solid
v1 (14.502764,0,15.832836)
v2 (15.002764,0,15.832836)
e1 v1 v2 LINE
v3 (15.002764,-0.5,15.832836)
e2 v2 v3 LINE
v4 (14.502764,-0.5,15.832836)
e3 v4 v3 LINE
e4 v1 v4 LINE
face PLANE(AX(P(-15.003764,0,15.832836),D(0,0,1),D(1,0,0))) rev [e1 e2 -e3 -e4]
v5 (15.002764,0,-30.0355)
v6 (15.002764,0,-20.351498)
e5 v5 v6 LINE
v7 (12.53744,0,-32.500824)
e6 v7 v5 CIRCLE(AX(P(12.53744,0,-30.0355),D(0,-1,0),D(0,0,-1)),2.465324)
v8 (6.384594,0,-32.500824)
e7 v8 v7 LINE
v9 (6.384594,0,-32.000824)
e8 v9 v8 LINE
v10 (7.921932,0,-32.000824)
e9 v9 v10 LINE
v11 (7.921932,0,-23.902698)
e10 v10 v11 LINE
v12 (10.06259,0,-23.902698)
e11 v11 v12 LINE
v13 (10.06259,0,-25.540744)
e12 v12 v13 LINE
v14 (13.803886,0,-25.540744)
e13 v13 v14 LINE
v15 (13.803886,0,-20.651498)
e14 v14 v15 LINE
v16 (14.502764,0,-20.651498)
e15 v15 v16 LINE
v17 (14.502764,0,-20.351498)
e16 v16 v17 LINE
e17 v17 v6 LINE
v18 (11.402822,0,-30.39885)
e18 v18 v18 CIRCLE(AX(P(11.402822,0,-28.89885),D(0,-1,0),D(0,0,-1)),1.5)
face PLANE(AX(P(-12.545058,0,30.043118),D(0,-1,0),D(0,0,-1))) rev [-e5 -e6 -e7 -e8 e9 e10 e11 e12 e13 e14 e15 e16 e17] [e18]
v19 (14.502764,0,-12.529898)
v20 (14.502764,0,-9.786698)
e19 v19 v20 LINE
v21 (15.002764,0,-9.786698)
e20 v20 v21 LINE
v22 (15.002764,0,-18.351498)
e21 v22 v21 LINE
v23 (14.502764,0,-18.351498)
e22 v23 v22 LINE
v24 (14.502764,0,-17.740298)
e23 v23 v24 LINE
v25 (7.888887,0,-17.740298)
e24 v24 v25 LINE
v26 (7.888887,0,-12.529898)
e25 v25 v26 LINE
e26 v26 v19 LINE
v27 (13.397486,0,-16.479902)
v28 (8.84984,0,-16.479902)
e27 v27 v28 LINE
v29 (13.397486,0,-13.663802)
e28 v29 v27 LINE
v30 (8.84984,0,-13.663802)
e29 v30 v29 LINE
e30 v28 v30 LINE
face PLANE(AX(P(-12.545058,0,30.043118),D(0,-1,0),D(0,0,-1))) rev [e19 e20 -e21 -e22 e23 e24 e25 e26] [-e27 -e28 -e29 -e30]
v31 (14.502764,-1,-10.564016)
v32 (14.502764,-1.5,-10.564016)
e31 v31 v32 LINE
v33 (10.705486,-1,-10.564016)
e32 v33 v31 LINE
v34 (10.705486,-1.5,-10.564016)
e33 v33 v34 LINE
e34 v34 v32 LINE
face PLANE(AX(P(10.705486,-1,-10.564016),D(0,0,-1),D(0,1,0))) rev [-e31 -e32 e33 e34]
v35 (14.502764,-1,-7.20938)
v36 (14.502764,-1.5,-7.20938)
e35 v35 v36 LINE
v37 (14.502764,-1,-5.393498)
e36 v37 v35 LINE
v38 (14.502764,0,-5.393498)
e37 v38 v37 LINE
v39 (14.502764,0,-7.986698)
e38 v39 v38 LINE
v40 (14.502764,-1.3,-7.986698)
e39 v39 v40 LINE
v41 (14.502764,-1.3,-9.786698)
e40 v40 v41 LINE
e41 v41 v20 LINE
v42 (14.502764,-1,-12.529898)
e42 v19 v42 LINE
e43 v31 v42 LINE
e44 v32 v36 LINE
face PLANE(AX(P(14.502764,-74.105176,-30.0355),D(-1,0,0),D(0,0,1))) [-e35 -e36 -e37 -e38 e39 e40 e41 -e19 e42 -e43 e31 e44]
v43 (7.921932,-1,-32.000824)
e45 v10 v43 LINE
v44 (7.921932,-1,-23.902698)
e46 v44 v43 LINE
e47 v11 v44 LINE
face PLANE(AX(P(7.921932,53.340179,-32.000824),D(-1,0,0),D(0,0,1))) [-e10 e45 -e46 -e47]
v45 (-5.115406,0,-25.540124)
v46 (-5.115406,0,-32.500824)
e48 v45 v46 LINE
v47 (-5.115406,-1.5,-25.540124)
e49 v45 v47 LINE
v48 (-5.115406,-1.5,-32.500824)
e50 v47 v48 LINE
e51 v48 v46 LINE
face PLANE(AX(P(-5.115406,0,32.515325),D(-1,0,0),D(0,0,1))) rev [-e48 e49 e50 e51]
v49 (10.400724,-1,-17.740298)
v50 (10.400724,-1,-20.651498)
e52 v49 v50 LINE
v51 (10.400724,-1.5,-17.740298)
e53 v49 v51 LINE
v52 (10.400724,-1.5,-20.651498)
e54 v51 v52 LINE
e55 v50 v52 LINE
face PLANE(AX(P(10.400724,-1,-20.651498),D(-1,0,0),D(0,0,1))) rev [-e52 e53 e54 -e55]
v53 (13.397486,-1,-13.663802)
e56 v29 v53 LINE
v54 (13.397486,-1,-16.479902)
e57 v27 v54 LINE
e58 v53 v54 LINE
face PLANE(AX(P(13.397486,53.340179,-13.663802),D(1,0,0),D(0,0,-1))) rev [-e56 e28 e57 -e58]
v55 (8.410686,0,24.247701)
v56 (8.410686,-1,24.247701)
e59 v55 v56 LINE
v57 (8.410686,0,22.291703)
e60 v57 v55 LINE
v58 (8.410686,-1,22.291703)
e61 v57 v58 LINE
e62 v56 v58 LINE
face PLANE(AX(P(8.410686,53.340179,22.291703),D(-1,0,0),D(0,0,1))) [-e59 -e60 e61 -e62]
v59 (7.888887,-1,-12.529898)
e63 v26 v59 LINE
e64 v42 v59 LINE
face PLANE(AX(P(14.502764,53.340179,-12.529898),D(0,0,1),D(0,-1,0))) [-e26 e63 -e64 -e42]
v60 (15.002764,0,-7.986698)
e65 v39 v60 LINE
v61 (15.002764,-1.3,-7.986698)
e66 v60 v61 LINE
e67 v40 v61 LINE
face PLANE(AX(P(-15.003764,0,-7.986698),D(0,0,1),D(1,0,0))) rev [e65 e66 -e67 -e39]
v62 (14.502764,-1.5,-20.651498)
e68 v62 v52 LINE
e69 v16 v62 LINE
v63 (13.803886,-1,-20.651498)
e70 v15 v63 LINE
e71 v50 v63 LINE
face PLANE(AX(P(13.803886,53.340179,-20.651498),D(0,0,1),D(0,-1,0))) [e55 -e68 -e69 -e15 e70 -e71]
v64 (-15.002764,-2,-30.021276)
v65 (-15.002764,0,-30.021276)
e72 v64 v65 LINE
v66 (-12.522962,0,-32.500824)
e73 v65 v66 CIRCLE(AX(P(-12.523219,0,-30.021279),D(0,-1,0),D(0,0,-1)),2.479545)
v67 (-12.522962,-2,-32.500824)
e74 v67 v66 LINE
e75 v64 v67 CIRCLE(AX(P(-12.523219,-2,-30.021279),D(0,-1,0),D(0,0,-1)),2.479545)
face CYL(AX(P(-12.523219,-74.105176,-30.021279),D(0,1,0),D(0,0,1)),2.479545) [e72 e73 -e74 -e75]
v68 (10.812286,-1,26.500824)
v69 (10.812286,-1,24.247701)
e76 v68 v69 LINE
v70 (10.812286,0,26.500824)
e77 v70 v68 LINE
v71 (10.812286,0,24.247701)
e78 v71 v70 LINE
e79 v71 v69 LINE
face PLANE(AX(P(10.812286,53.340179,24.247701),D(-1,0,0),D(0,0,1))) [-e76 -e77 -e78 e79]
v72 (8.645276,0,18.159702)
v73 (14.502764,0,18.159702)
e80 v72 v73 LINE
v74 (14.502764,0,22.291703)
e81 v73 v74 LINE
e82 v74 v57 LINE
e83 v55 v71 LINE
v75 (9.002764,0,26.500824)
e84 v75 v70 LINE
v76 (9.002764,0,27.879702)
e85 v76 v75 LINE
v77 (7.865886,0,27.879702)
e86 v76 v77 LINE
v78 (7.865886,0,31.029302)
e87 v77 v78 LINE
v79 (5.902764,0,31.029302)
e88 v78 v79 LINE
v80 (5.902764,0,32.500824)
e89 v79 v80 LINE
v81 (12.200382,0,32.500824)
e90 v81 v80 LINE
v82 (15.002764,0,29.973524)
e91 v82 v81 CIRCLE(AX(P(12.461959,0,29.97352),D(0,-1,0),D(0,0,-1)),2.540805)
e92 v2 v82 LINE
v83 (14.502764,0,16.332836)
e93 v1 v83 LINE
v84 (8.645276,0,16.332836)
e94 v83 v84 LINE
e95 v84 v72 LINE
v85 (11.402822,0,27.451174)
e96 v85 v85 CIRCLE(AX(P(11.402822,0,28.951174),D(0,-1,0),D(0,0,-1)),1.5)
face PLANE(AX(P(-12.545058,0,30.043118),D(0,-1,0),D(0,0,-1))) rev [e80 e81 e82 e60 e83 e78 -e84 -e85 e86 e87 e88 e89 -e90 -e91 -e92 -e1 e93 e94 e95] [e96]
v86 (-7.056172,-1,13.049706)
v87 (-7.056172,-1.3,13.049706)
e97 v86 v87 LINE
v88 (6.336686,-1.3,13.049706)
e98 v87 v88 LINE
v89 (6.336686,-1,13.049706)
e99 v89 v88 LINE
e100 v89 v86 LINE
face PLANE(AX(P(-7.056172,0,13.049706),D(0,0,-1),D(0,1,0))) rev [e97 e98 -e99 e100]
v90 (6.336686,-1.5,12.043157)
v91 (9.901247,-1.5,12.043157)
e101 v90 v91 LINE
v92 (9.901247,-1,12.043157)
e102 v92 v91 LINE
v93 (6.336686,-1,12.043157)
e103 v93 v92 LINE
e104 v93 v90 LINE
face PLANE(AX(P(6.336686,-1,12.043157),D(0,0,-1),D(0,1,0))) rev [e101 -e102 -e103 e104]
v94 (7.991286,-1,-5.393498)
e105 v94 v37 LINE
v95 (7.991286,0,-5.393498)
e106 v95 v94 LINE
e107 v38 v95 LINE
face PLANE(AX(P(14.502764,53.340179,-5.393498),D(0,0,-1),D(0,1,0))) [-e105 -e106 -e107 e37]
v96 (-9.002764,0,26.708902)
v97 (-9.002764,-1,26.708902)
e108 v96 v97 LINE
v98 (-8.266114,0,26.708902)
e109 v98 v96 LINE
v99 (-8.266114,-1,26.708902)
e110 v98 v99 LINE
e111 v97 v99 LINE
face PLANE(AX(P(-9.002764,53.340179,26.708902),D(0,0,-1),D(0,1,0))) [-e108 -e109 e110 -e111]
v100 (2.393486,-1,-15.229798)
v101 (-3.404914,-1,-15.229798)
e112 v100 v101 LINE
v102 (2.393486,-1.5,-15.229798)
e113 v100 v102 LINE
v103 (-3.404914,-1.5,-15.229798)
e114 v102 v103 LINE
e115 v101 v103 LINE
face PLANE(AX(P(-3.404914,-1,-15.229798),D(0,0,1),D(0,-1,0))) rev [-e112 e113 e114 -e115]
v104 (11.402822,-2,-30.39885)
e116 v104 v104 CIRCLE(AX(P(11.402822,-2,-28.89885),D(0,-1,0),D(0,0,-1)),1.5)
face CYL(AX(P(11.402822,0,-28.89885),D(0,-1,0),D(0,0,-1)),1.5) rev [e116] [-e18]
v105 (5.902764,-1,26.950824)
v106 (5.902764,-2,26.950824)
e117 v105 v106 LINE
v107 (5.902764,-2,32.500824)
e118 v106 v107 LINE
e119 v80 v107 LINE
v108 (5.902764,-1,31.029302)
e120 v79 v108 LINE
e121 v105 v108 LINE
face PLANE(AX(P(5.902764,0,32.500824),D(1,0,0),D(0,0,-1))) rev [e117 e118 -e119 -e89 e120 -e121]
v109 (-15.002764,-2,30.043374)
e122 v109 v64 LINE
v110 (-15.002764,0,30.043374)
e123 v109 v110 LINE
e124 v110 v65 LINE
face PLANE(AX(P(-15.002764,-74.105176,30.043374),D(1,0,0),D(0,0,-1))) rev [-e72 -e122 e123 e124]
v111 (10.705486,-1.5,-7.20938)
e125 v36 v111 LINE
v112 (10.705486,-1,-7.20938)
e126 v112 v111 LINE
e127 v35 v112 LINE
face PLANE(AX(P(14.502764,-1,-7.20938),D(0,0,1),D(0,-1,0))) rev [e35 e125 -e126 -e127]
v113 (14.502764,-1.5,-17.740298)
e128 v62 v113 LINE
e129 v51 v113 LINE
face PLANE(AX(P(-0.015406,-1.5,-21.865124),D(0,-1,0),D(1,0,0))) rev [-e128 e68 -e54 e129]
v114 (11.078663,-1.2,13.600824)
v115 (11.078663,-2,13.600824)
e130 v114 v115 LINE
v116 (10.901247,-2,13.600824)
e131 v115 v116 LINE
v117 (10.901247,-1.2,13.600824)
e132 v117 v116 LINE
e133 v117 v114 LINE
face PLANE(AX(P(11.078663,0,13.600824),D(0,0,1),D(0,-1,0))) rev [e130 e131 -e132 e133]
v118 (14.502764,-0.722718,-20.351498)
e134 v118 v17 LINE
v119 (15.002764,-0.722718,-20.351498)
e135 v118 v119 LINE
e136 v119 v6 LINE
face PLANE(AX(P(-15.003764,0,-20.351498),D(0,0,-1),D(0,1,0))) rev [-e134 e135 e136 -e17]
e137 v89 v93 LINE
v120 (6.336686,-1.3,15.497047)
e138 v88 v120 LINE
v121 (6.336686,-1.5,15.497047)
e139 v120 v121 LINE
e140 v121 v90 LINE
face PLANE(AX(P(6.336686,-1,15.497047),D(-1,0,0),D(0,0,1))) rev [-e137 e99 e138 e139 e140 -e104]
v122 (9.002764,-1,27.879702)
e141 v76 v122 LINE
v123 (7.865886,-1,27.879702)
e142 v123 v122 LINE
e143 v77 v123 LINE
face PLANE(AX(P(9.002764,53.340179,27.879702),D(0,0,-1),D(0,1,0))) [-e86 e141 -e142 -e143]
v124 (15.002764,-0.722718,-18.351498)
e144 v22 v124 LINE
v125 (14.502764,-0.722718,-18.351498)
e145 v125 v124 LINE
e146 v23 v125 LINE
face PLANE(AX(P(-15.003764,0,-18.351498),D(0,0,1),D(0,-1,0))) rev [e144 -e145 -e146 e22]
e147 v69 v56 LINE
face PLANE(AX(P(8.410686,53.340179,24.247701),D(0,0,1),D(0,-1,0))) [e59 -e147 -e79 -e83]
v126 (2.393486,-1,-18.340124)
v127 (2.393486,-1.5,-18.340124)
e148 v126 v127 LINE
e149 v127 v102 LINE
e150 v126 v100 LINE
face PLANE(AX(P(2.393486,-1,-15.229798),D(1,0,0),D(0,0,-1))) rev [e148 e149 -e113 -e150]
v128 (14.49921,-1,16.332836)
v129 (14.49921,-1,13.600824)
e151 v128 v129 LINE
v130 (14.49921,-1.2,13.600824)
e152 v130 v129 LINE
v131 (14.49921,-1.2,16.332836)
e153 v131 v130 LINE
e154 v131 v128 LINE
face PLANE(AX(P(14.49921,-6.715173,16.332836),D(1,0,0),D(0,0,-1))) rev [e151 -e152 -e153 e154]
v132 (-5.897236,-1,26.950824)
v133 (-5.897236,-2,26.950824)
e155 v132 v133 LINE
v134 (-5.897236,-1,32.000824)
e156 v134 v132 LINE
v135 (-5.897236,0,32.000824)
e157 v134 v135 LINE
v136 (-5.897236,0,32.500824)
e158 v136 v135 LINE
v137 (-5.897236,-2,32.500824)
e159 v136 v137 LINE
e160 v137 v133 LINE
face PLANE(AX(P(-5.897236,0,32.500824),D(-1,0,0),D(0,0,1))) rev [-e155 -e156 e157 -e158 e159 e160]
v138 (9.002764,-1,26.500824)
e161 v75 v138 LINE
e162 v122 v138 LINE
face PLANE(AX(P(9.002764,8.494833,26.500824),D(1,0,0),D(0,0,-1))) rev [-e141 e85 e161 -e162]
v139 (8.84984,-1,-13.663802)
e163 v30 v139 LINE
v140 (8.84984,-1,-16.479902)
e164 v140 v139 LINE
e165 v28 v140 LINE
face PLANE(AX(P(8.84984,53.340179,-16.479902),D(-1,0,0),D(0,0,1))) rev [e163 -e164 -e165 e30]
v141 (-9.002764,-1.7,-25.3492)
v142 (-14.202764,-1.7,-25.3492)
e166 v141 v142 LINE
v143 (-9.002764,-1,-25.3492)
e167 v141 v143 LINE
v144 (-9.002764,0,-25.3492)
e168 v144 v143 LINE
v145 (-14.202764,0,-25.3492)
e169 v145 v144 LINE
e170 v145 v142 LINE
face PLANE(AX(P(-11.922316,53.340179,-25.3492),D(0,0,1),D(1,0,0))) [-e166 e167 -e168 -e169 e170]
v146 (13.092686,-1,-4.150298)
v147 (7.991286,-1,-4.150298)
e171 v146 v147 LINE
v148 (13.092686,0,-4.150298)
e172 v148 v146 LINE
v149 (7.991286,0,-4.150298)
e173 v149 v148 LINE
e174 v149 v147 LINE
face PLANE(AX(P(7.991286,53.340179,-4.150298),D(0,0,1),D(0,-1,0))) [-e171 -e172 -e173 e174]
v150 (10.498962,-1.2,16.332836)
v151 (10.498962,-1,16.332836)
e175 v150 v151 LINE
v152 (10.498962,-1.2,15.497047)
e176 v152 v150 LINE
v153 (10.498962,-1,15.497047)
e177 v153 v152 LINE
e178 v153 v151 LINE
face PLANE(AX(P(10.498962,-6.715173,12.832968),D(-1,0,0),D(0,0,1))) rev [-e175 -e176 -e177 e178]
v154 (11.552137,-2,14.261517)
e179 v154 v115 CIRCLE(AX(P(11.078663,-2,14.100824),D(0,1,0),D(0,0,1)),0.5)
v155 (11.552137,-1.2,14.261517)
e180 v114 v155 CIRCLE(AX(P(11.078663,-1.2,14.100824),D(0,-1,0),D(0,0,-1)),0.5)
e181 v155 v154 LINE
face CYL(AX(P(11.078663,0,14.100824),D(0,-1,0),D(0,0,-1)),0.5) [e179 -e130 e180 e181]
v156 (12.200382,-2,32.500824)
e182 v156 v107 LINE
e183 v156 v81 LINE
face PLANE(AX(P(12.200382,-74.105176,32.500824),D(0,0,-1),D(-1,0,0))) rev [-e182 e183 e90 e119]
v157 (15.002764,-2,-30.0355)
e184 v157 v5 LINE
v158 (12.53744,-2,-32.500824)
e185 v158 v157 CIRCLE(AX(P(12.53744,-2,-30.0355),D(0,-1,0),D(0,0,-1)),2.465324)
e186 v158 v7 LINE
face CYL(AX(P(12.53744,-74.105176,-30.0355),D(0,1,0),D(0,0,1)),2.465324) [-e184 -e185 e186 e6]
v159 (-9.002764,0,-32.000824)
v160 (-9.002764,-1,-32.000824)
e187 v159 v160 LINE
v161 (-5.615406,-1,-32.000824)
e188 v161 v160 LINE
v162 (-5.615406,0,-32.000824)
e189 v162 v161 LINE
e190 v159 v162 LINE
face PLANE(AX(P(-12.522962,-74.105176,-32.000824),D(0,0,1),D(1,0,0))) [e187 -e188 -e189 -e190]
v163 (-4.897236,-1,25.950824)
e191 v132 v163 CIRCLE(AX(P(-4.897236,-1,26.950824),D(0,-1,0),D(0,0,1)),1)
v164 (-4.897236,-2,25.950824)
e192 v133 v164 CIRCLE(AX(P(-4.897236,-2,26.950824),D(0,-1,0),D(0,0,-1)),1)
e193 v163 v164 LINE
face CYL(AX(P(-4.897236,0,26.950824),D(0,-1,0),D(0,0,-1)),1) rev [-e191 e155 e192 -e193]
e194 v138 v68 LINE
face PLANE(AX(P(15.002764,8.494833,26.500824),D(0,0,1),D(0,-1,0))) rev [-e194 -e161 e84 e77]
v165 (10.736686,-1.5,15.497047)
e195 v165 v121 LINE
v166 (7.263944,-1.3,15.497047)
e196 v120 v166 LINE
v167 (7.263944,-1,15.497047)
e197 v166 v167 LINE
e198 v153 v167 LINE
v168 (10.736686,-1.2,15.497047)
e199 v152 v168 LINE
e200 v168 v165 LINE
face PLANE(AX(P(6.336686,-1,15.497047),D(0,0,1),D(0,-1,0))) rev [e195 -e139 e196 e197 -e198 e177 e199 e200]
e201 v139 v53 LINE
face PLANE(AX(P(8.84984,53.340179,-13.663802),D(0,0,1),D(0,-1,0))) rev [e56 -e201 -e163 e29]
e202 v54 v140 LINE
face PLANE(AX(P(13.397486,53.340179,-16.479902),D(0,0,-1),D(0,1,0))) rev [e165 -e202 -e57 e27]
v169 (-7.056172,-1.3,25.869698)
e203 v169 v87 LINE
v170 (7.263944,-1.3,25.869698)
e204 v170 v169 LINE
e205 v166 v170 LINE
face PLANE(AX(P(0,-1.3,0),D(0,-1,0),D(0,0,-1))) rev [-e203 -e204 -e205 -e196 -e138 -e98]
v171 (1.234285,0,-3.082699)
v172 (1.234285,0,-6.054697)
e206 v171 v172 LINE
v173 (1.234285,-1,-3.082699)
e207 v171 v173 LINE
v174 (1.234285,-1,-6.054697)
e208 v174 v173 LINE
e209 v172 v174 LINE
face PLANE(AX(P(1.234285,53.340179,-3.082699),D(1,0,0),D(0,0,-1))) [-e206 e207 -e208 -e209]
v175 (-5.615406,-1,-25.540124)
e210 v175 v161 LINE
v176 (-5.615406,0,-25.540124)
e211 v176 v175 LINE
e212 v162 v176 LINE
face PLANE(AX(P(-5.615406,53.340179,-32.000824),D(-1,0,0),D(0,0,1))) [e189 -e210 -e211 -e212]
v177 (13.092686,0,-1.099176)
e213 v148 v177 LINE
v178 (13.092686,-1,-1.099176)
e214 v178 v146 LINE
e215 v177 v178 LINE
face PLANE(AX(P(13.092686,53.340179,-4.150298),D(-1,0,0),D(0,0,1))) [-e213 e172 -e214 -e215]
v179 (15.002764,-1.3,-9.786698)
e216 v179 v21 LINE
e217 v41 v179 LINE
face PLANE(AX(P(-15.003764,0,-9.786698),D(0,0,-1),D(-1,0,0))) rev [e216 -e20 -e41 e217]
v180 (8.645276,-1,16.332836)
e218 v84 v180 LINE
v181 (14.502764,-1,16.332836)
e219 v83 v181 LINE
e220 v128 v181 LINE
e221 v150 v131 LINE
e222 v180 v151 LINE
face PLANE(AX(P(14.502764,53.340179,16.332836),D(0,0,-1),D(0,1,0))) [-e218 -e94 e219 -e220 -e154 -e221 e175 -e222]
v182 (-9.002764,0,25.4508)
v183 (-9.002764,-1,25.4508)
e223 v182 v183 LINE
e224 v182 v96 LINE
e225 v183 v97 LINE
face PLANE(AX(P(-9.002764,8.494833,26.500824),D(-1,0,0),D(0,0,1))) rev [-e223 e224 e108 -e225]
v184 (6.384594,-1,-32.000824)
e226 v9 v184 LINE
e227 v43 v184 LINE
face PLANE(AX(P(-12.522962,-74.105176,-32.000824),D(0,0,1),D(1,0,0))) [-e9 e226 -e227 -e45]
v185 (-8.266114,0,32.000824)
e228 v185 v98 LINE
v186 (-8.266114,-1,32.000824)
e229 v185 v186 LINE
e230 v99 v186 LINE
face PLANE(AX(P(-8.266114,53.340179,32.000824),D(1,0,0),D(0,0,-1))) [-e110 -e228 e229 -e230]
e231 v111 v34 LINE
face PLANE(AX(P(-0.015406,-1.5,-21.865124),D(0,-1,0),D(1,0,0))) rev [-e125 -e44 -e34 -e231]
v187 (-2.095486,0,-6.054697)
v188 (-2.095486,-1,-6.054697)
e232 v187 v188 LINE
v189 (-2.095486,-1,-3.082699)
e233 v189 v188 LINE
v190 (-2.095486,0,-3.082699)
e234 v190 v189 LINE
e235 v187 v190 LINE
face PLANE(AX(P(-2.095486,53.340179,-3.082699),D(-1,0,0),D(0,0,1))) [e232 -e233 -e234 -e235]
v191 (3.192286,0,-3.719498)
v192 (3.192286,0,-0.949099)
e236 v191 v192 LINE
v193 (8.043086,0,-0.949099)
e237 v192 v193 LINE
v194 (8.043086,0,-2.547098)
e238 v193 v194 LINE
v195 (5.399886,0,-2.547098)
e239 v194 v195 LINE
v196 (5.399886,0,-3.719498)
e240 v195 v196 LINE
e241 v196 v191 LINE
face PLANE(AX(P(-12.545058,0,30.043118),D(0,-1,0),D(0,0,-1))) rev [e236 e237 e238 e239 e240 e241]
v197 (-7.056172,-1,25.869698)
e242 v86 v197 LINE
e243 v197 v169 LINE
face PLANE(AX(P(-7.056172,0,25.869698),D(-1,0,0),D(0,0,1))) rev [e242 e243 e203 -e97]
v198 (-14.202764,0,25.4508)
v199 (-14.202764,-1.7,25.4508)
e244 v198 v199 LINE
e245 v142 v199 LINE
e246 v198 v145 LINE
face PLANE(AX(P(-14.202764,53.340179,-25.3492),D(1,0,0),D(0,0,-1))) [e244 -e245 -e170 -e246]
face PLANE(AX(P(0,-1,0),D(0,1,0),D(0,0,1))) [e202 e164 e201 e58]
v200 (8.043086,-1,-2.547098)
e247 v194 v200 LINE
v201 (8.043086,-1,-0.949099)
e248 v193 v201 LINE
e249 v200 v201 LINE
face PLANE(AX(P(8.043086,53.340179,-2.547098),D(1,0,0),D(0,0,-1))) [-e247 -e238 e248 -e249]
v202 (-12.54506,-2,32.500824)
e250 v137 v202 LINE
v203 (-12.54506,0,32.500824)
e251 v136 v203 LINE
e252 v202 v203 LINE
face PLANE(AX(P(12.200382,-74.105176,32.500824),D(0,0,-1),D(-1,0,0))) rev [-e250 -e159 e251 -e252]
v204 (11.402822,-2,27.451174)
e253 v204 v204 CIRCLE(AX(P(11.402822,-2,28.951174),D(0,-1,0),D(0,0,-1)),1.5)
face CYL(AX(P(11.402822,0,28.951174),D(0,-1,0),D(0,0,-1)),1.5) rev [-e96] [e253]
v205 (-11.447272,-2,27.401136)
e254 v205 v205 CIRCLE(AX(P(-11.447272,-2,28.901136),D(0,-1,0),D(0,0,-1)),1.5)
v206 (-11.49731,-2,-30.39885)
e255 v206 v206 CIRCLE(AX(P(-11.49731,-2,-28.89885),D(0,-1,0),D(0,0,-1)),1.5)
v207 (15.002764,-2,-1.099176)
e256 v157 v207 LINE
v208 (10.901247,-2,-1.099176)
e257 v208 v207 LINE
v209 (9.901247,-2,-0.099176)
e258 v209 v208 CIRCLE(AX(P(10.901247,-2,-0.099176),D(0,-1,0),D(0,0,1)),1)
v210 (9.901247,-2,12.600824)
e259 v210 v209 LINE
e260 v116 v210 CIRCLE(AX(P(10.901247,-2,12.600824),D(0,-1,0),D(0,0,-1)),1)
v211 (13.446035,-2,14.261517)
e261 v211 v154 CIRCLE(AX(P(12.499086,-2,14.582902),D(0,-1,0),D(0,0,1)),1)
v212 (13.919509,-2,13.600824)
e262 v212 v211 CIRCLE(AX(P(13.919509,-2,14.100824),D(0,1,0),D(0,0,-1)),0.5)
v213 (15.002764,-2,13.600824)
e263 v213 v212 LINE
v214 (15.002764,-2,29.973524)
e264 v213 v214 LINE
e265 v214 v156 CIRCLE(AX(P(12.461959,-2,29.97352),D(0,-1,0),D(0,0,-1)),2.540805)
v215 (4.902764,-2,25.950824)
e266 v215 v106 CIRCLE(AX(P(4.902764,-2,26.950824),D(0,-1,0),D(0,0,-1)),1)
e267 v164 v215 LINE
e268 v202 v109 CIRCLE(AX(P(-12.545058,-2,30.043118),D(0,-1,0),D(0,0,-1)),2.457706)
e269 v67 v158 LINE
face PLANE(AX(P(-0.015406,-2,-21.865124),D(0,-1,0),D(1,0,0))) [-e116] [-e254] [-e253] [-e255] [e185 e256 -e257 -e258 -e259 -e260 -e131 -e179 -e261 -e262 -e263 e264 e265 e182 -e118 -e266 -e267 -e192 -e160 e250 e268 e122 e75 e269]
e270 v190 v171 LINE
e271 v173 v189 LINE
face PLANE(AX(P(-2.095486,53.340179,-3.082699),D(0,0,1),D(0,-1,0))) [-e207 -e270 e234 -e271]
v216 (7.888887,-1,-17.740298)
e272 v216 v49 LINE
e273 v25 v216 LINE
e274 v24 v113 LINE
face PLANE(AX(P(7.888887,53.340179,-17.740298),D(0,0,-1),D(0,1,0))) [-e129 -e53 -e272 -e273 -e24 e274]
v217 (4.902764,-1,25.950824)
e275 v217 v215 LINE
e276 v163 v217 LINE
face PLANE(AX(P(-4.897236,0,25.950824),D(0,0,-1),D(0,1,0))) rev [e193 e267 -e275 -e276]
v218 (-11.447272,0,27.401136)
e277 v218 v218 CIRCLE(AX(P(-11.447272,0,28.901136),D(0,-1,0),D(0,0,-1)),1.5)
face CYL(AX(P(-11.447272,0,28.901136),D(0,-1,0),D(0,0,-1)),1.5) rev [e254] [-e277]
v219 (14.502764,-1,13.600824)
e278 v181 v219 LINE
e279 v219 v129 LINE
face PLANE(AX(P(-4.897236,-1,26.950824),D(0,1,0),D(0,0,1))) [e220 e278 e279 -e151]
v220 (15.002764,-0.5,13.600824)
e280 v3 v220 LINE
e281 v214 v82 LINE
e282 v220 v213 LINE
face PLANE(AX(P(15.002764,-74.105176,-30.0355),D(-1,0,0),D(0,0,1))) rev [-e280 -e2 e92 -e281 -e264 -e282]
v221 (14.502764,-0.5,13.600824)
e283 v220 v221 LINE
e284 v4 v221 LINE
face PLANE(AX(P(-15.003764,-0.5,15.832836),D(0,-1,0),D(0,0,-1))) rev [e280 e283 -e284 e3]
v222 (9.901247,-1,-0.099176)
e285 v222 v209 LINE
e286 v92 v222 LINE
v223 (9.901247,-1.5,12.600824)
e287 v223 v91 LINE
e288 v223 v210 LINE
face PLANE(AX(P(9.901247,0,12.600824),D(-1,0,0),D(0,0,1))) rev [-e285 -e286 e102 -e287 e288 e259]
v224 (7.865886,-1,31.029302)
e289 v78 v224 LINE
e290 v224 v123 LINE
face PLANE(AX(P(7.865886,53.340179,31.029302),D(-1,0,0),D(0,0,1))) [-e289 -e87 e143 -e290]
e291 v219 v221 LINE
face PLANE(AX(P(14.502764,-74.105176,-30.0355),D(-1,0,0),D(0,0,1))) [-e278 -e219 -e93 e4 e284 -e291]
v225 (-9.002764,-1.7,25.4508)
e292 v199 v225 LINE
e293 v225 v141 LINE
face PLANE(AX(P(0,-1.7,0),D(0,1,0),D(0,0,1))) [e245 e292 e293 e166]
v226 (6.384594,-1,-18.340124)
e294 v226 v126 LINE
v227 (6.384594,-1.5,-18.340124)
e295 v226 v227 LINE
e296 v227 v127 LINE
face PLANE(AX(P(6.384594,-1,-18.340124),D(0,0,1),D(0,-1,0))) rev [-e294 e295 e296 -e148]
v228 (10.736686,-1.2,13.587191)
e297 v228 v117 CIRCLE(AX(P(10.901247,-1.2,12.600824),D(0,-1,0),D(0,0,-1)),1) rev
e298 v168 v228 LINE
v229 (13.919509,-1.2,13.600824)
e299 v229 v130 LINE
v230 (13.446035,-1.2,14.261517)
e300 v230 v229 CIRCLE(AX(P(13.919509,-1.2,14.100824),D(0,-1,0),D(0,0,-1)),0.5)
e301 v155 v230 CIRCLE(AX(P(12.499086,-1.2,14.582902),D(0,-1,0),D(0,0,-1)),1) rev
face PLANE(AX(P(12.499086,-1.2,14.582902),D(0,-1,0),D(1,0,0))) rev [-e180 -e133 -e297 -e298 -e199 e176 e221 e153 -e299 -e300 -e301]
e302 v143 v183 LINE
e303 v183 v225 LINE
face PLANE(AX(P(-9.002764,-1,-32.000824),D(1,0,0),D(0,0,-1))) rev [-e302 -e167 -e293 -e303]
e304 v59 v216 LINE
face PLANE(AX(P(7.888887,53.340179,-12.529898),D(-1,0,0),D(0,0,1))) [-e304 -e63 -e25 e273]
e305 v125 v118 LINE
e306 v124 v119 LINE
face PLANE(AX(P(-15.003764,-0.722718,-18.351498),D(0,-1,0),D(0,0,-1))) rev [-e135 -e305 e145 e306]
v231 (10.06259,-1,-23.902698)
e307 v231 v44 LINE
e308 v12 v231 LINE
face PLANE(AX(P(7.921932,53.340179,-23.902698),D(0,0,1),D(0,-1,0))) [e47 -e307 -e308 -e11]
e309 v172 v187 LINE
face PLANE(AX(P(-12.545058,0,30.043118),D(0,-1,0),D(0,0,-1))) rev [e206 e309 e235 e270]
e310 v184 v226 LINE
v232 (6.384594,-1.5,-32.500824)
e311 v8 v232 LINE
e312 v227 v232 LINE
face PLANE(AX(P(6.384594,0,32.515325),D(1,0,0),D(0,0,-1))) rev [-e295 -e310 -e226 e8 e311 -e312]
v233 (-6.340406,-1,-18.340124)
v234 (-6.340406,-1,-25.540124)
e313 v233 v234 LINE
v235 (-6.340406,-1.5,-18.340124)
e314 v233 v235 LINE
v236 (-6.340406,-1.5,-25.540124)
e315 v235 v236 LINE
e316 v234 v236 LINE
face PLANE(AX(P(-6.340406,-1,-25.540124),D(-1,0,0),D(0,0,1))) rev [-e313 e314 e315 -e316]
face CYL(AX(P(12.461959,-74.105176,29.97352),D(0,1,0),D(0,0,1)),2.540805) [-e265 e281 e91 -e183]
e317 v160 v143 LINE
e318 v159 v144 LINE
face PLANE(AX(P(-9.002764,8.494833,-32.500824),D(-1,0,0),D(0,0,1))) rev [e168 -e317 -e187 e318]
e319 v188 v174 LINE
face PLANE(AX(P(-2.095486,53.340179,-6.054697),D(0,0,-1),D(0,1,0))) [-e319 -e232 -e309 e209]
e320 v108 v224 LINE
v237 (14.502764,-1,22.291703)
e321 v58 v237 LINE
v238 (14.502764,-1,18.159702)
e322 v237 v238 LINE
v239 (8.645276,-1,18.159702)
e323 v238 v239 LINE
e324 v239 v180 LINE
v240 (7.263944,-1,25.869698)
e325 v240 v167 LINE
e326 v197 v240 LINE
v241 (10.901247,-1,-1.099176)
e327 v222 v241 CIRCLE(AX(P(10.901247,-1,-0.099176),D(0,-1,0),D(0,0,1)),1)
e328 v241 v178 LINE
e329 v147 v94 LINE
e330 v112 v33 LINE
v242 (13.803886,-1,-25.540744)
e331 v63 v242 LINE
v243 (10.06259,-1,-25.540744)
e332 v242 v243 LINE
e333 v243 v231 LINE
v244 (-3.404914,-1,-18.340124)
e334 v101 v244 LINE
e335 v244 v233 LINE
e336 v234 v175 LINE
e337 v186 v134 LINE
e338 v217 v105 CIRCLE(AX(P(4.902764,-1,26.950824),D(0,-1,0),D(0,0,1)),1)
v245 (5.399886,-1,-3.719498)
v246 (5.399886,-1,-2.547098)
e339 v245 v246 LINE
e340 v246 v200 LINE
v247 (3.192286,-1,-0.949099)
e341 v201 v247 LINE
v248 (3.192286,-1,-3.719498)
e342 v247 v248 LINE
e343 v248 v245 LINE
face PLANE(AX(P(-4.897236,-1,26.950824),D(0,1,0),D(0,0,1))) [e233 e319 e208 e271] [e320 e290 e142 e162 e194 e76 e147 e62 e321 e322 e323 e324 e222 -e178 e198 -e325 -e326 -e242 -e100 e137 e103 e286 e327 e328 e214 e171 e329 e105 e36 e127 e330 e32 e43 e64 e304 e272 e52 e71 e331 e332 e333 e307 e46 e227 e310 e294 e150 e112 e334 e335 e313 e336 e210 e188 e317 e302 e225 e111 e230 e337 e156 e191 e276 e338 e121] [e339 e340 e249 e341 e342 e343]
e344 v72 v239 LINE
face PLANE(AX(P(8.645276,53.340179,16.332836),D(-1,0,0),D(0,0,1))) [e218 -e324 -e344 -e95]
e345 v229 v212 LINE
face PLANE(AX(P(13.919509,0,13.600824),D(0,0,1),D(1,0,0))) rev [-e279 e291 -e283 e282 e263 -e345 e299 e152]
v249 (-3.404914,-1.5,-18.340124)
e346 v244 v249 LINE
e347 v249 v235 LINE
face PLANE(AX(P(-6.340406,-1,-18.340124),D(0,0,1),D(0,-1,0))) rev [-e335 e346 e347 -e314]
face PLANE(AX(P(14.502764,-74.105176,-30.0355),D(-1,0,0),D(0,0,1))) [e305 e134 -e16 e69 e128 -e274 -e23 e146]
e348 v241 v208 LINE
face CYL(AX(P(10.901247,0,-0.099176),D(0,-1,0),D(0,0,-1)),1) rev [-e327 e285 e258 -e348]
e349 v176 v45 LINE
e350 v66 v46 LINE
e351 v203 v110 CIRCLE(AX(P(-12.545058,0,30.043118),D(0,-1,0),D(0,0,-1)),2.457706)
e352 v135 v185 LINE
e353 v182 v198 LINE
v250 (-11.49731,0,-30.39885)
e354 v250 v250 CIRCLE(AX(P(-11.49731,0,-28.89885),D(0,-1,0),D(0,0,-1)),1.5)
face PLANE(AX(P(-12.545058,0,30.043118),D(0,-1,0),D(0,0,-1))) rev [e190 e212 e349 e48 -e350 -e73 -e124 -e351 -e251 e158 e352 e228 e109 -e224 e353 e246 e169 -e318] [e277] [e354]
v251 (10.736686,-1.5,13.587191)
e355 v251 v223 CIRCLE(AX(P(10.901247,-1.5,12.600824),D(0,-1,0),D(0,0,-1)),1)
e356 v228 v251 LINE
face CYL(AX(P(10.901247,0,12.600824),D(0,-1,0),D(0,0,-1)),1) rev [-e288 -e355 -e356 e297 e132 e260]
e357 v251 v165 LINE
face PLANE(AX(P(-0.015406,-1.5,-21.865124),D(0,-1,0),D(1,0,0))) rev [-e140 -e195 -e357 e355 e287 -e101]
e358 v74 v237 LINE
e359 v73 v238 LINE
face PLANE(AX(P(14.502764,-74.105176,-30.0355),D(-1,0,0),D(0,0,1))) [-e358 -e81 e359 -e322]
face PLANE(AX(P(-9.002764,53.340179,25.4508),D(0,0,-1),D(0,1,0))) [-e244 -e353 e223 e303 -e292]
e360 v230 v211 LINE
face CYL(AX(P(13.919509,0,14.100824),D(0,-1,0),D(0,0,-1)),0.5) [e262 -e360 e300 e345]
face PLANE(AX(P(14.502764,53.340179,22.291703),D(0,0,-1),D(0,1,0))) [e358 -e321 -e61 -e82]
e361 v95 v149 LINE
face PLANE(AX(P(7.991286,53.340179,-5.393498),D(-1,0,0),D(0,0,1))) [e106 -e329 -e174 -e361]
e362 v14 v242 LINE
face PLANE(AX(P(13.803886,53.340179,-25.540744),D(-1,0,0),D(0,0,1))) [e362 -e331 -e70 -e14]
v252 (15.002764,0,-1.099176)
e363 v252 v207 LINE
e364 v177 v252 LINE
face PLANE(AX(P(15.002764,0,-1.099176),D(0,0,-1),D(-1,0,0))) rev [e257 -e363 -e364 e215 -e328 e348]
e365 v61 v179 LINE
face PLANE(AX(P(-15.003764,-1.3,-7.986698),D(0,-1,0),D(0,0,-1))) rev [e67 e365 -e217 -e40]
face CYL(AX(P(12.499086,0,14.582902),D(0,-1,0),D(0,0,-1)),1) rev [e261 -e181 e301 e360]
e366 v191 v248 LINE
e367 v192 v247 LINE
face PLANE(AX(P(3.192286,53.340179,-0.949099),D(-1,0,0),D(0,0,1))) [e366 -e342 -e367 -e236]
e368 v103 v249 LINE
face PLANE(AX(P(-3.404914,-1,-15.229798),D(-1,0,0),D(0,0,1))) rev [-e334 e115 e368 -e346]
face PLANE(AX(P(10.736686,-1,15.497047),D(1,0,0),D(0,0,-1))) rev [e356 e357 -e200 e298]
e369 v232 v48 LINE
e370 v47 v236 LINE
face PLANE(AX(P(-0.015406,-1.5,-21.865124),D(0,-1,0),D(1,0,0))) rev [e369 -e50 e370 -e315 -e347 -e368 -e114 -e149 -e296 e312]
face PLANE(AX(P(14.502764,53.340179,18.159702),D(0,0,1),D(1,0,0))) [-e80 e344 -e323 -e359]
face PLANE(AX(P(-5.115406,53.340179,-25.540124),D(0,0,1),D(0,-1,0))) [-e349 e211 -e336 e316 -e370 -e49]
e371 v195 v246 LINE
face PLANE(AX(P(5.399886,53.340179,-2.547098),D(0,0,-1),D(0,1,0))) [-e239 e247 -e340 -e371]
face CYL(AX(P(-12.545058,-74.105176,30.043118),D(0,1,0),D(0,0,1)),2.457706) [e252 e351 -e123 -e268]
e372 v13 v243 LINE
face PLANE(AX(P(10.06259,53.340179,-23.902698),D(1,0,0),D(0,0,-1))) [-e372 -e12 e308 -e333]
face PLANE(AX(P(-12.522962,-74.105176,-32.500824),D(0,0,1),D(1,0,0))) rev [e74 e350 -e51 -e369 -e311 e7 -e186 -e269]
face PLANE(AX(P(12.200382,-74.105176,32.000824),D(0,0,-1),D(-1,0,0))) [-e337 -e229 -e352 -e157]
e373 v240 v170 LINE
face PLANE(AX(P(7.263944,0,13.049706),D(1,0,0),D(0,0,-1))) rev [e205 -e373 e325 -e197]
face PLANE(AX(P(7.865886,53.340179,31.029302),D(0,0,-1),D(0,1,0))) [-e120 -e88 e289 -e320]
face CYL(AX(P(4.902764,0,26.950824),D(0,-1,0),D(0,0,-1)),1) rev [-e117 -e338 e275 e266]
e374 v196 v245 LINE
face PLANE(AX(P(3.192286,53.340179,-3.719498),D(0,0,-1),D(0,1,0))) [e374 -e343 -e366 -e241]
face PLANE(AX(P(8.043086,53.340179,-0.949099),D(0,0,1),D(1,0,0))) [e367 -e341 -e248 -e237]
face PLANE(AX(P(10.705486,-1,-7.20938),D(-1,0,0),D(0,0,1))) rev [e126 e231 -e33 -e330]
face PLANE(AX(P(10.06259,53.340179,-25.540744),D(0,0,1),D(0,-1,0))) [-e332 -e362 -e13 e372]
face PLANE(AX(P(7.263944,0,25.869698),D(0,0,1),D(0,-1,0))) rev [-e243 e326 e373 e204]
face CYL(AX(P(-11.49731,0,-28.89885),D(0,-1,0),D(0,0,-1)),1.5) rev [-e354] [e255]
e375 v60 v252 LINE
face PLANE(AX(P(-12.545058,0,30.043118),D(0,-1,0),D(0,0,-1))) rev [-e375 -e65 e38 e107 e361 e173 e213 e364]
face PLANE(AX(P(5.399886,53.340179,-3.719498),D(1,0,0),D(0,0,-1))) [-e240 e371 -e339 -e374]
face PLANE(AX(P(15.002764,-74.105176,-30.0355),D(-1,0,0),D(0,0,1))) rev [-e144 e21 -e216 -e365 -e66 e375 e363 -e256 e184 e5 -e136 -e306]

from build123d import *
from build123d.topology import SkipClean

# Parameters (mm, degrees)
BOSS_EXTRUDE1_DEPTH      = 2
SHELL1_T                 = -0.5
BOSS_EXTRUDE3_START      = 1.5
BOSS_EXTRUDE3_DEPTH      = 1.5
SKETCH7_R                = 1.5
CUT_EXTRUDE4_DEPTH       = 36.864526101
CUT_EXTRUDE5_DEPTH       = 36.864526101
CUT_EXTRUDE6_REACH       = 68.754
SKETCH9_W                = 11.5
SKETCH9_H                = 1.5
SKETCH10_W               = 0.73665
SKETCH10_H               = 5.291922
SKETCH10_W_2             = 6.6138774
SKETCH10_H_2             = 5.2104
SKETCH10_W_3             = 4.547646
SKETCH10_H_3             = 2.8161
SKETCH10_W_4             = 5.857488
SKETCH10_H_4             = 1.826866
SKETCH10_W_5             = 0.5
SKETCH10_H_5             = 6.4607
SKETCH10_W_6             = 3.3297711
SKETCH10_H_6             = 2.9719988
BOSS_EXTRUDE4_DEPTH      = 2
SKETCH12_W               = 4.547646
SKETCH12_H               = 2.8161
BOSS_EXTRUDE6_DEPTH      = 0.5
CUT_EXTRUDE7_DEPTH       = 0.5
CUT_EXTRUDE7_DEPTH_BACK  = 36.828818463
SKETCH13_W               = 14.320116
SKETCH13_H               = 12.819992
CUT_EXTRUDE8_START       = -0.5
CUT_EXTRUDE8_OUTLINE_W   = 1.8
CUT_EXTRUDE8_OUTLINE_H   = 1.3
CUT_EXTRUDE8_OUTLINE_W_2 = 2
CUT_EXTRUDE8_OUTLINE_H_2 = 0.722717803
CUT_EXTRUDE8_DEPTH       = 0.5
CUT_EXTRUDE9_DEPTH       = 36.84012043
CUT_EXTRUDE9_DEPTH_BACK  = 0.2
SKETCH15_W               = 5.2
SKETCH15_H               = 50.8
SKETCH16_W               = 4.000248
SKETCH16_H               = 3.499868
CUT_EXTRUDE10_DEPTH      = 0.2
CUT_EXTRUDE11_START      = -0.5
CUT_EXTRUDE11_OUTLINE_W  = 2.232012
CUT_EXTRUDE11_OUTLINE_H  = 0.5
CUT_EXTRUDE11_DEPTH      = 0.5


# Read off the part's stored shape, not the designer's step: Cut-Extrude8, Cut-Extrude11
with BuildPart() as part:
    # Sketch1 → Boss-Extrude1 (new body)
    with BuildSketch(Plane.XZ):
        with BuildLine():
            Line((-15.002764, 30.043374), (-15.002764, -30.021276))
            ThreePointArc((-15.002764, -30.021276), (-14.276432231, -31.77467184), (-12.522962, -32.500824))
            Line((-12.522962, -32.500824), (12.53744, -32.500824))
            ThreePointArc((12.53744, -32.500824), (14.280687318, -31.778747318), (15.002764, -30.0355))
            Line((15.002764, -30.0355), (15.002764, 29.973524))
            ThreePointArc((15.002764, 29.973524), (14.163585126, 31.860357898), (12.200382, 32.500824))
            Line((12.200382, 32.500824), (-12.54506, 32.500824))
            ThreePointArc((-12.54506, 32.500824), (-14.282828873, 31.781068474), (-15.002764, 30.043374))
        make_face()
    extrude(amount=BOSS_EXTRUDE1_DEPTH)

    # Shell1
    shell1_openings = [part.faces().sort_by_distance(p)[0] for p in [
        (-0.00028204, 0, -0.000340146),
    ]]
    offset(amount=SHELL1_T, openings=shell1_openings, kind=Kind.INTERSECTION)

    # Sketch6 → Boss-Extrude3 (add)
    with BuildSketch(Plane(origin=(0, -1.5, 0), x_dir=(1, 0, 0), z_dir=(0, 1, 0)).offset(BOSS_EXTRUDE3_START)):
        with BuildLine():
            Line((-9.002764, 32.500824), (-9.002764, 26.500824))
            Line((-9.002764, 26.500824), (-15.002764, 26.500824))
            Line((-15.002764, 26.500824), (-15.002764, 30.021276))
            ThreePointArc((-15.002764, 30.021276), (-14.276432231, 31.77467184), (-12.522962, 32.500824))
            Line((-12.522962, 32.500824), (-9.002764, 32.500824))
        make_face()
        with BuildLine():
            Line((9.002764, 32.500824), (9.002764, 26.500824))
            Line((9.002764, 26.500824), (15.002764, 26.500824))
            Line((15.002764, 26.500824), (15.002764, 30.0355))
            ThreePointArc((15.002764, 30.0355), (14.280687318, 31.778747318), (12.53744, 32.500824))
            Line((12.53744, 32.500824), (9.002764, 32.500824))
        make_face()
        with BuildLine():
            Line((15.002764, -26.500824), (9.002764, -26.500824))
            Line((9.002764, -26.500824), (9.002764, -32.500824))
            Line((9.002764, -32.500824), (12.200382, -32.500824))
            ThreePointArc((12.200382, -32.500824), (14.163585126, -31.860357898), (15.002764, -29.973524))
            Line((15.002764, -29.973524), (15.002764, -26.500824))
        make_face()
        with BuildLine():
            Line((-12.54506, -32.500824), (-9.002764, -32.500824))
            Line((-9.002764, -32.500824), (-9.002764, -26.500824))
            Line((-9.002764, -26.500824), (-15.002764, -26.500824))
            Line((-15.002764, -26.500824), (-15.002764, -30.043374))
            ThreePointArc((-15.002764, -30.043374), (-14.282828873, -31.781068474), (-12.54506, -32.500824))
        make_face()
    extrude(amount=-BOSS_EXTRUDE3_DEPTH)

    # Sketch7 → Cut-Extrude4 (cut, through all)
    with BuildSketch(Plane.XZ.offset(2)):
        with Locations(Location((-11.447272, 28.901136, 0), (0, 0, 270))):
            Circle(SKETCH7_R)
        with Locations(Location((11.402822, 28.951174, 0), (0, 0, 270))):
            Circle(SKETCH7_R)
        with Locations(Location((11.402822, -28.89885, 0), (0, 0, 270))):
            Circle(SKETCH7_R)
        with Locations(Location((-11.49731, -28.89885, 0), (0, 0, 270))):
            Circle(SKETCH7_R)
    extrude(amount=-CUT_EXTRUDE4_DEPTH, mode=Mode.SUBTRACT)

    # Sketch8 → Cut-Extrude5 (cut, through all)
    with BuildSketch(Plane.XZ.offset(2)):
        with BuildLine():
            Line((-5.897236, 32.500824), (5.902764, 32.500824))
            Line((5.902764, 32.500824), (5.902764, 26.950824))
            ThreePointArc((5.902764, 26.950824), (5.609870781, 26.243717219), (4.902764, 25.950824))
            Line((4.902764, 25.950824), (-4.897236, 25.950824))
            ThreePointArc((-4.897236, 25.950824), (-5.604342781, 26.243717219), (-5.897236, 26.950824))
            Line((-5.897236, 26.950824), (-5.897236, 32.500824))
        make_face()
        with BuildLine():
            Line((15.002764, 13.600824), (15.002764, -1.099176))
            Line((15.002764, -1.099176), (10.901247394, -1.099176))
            ThreePointArc((10.901247394, -1.099176), (10.194140612, -0.806282781), (9.901247394, -0.099176))
            Line((9.901247394, -0.099176), (9.901247394, 12.600824))
            ThreePointArc((9.901247394, 12.600824), (10.194140612, 13.307930781), (10.901247394, 13.600824))
            Line((10.901247394, 13.600824), (11.078663245, 13.600824))
            ThreePointArc((11.078663245, 13.600824), (11.485078263, 13.809573535), (11.552137497, 14.261516667))
            ThreePointArc((11.552137497, 14.261516667), (12.499086, 15.582902), (13.446034503, 14.261516667))
            ThreePointArc((13.446034503, 14.261516667), (13.513093737, 13.809573535), (13.919508755, 13.600824))
            Line((13.919508755, 13.600824), (15.002764, 13.600824))
        make_face()
    extrude(amount=-CUT_EXTRUDE5_DEPTH, mode=Mode.SUBTRACT)

    # Sketch9 → Cut-Extrude6 (cut, up to next)
    with BuildSketch(Plane(origin=(0, 0, -32.500824), x_dir=(-1, 0, 0), z_dir=(0, 0, -1)), mode=Mode.PRIVATE) as cut_extrude6_sk1:
        with Locations((-0.634594, -0.75)):
            Rectangle(SKETCH9_W, SKETCH9_H)
    cut_extrude6_tool1 = extrude(cut_extrude6_sk1.sketch, amount=-CUT_EXTRUDE6_REACH, mode=Mode.PRIVATE) & part.part
    add(cut_extrude6_tool1.solids().sort_by_distance((0.634594, -0.75, -32.500824))[0], mode=Mode.SUBTRACT)

    # Sketch10 → Boss-Extrude4 (add)
    # profile 1 of 11: a face of its own
    with BuildSketch(Plane.XZ.offset(2)):
        Polygon((-14.202764, -25.3492), (-14.202764, 25.4508), (-11.922316, 25.4508), (-11.422316, 25.4508), (-9.002764, 25.4508), (-9.002764, 26.500824), (-15.002764, 26.500824), (-15.002764, -26.500824), (-9.002764, -26.500824), (-9.002764, -25.3492), (-11.422316, -25.3492), (-11.922316, -25.3492), align=None)
    # profile 2 of 11: a face of its own
    with BuildSketch(Plane.XZ.offset(2)):
        Polygon((7.991286, -5.393498), (7.991286, -4.150298), (13.092686, -4.150298), (13.092686, -1.099176), (14.502764, -1.099176), (14.502764, -5.393498), align=None)
    # profile 3 of 11: a face of its own
    with BuildSketch(Plane.XZ.offset(2)):
        Polygon((14.502764, 26.500824), (10.8122863, 26.500824), (10.8122863, 24.2477014), (8.410686, 24.2477014), (8.410686, 22.2917026), (14.502764, 22.2917026), align=None)
    # profile 4 of 11: a face of its own
    with BuildSketch(Plane.XZ.offset(2)):
        Polygon((9.002764, 32.000824), (9.002764, 27.879702), (7.865886, 27.879702), (7.865886, 31.029302), (5.902764, 31.029302), (5.902764, 32.000824), align=None)
    # profile 5 of 11: a face of its own
    with BuildSketch(Plane.XZ.offset(2)):
        with Locations((-8.634439, 29.354863)):
            Rectangle(SKETCH10_W, SKETCH10_H)
    # profile 6 of 11: a face of its own
    with BuildSketch(Plane.XZ.offset(2)):
        with Locations((11.1958253, -15.135098)):
            Rectangle(SKETCH10_W_2, SKETCH10_H_2)
        with Locations((11.123663, -15.071852)):
            Rectangle(SKETCH10_W_3, SKETCH10_H_3, mode=Mode.SUBTRACT)
    # profile 7 of 11: a face of its own
    with BuildSketch(Plane.XZ.offset(2)):
        with Locations((11.57402, 17.246269)):
            Rectangle(SKETCH10_W_4, SKETCH10_H_4)
    # profile 8 of 11: a face of its own
    with BuildSketch(Plane.XZ.offset(2)):
        with Locations((-5.365406, -28.770474)):
            Rectangle(SKETCH10_W_5, SKETCH10_H_5)
    # profile 9 of 11: a face of its own
    with BuildSketch(Plane.XZ.offset(2)):
        Polygon((9.002764, -32.000824), (7.921932, -32.000824), (7.921932, -23.902698), (10.06259, -23.902698), (10.06259, -25.540744), (13.803886, -25.540744), (13.803886, -20.651498), (14.502764, -20.651498), (14.502764, -26.500824), (9.002764, -26.500824), align=None)
    # profile 10 of 11: a face of its own
    with BuildSketch(Plane.XZ.offset(2)):
        Polygon((3.192286, -3.719498), (5.399886, -3.719498), (5.399886, -2.547098), (8.043086, -2.547098), (8.043086, -0.9490986), (3.192286, -0.9490986), align=None)
    # profile 11 of 11: a face of its own
    with BuildSketch(Plane.XZ.offset(2)):
        with Locations((-0.43060015, -4.568698)):
            Rectangle(SKETCH10_W_6, SKETCH10_H_6)
    extrude(amount=-BOSS_EXTRUDE4_DEPTH)

    # Sketch12 → Boss-Extrude6 (add)
    with SkipClean():  # the faces are left unmerged after this step: merging them gives an invalid solid
        with BuildSketch(Plane(origin=(0, -1.5, 0), x_dir=(1, 0, 0), z_dir=(0, 1, 0))):
            with BuildLine():
                Line((14.502764, 7.209380255), (10.705486, 7.209380255))
                Line((10.705486, 7.209380255), (10.705486, 10.564015745))
                Line((10.705486, 10.564015745), (14.502764, 10.564015745))
                Line((14.502764, 10.564015745), (14.502764, 12.529898))
                Line((14.502764, 12.529898), (7.8888866, 12.529898))
                Line((7.8888866, 12.529898), (7.8888866, 17.740298))
                Line((7.8888866, 17.740298), (10.400724, 17.740298))
                Line((10.400724, 17.740298), (10.400724, 20.651498))
                Line((10.400724, 20.651498), (13.803886, 20.651498))
                Line((13.803886, 20.651498), (13.803886, 25.540744))
                Line((13.803886, 25.540744), (10.06259, 25.540744))
                Line((10.06259, 25.540744), (10.06259, 23.902698))
                Line((10.06259, 23.902698), (7.921932, 23.902698))
                Line((7.921932, 23.902698), (7.921932, 32.000824))
                Line((7.921932, 32.000824), (6.384594, 32.000824))
                Line((6.384594, 32.000824), (6.384594, 18.340124))
                Line((6.384594, 18.340124), (2.393486, 18.340124))
                Line((2.393486, 18.340124), (2.393486, 15.229798))
                Line((2.393486, 15.229798), (-3.404914, 15.229798))
                Line((-3.404914, 15.229798), (-3.404914, 18.340124))
                Line((-3.404914, 18.340124), (-6.340406, 18.340124))
                Line((-6.340406, 18.340124), (-6.340406, 25.540124))
                Line((-6.340406, 25.540124), (-5.615406, 25.540124))
                Line((-5.615406, 25.540124), (-5.615406, 32.000824))
                Line((-5.615406, 32.000824), (-9.002764, 32.000824))
                Line((-9.002764, 32.000824), (-9.002764, -26.708902))
                Line((-9.002764, -26.708902), (-8.266114, -26.708902))
                Line((-8.266114, -26.708902), (-8.266114, -32.000824))
                Line((-8.266114, -32.000824), (-5.897236, -32.000824))
                Line((-5.897236, -32.000824), (-5.897236, -26.950824))
                ThreePointArc((-5.897236, -26.950824), (-5.604342781, -26.243717219), (-4.897236, -25.950824))
                Line((-4.897236, -25.950824), (4.902764, -25.950824))
                ThreePointArc((4.902764, -25.950824), (5.609870781, -26.243717219), (5.902764, -26.950824))
                Line((5.902764, -26.950824), (5.902764, -31.029302))
                Line((5.902764, -31.029302), (7.865886, -31.029302))
                Line((7.865886, -31.029302), (7.865886, -27.879702))
                Line((7.865886, -27.879702), (9.002764, -27.879702))
                Line((9.002764, -27.879702), (9.002764, -26.500824))
                Line((9.002764, -26.500824), (10.8122863, -26.500824))
                Line((10.8122863, -26.500824), (10.8122863, -24.2477014))
                Line((10.8122863, -24.2477014), (8.410686, -24.2477014))
                Line((8.410686, -24.2477014), (8.410686, -22.2917026))
                Line((8.410686, -22.2917026), (14.502764, -22.2917026))
                Line((14.502764, -22.2917026), (14.502764, -18.159702))
                Line((14.502764, -18.159702), (8.645276, -18.159702))
                Line((8.645276, -18.159702), (8.645276, -16.332836))
                Line((8.645276, -16.332836), (14.502764, -16.332836))
                Line((14.502764, -16.332836), (14.502764, -13.600824))
                Line((14.502764, -13.600824), (13.919508755, -13.600824))
                ThreePointArc((13.919508755, -13.600824), (13.513093737, -13.809573535), (13.446034503, -14.261516667))
                ThreePointArc((13.446034503, -14.261516667), (12.499086, -15.582902), (11.552137497, -14.261516667))
                ThreePointArc((11.552137497, -14.261516667), (11.485078263, -13.809573535), (11.078663245, -13.600824))
                Line((11.078663245, -13.600824), (10.901247394, -13.600824))
                ThreePointArc((10.901247394, -13.600824), (10.818684818, -13.597409882), (10.736686, -13.587190842))
                Line((10.736686, -13.587190842), (10.736686, -15.497047053))
                Line((10.736686, -15.497047053), (6.336686, -15.497047053))
                Line((6.336686, -15.497047053), (6.336686, -12.043156947))
                Line((6.336686, -12.043156947), (9.901247394, -12.043156947))
                Line((9.901247394, -12.043156947), (9.901247394, 0.099176))
                ThreePointArc((9.901247394, 0.099176), (10.194140612, 0.806282781), (10.901247394, 1.099176))
                Line((10.901247394, 1.099176), (13.092686, 1.099176))
                Line((13.092686, 1.099176), (13.092686, 4.150298))
                Line((13.092686, 4.150298), (7.991286, 4.150298))
                Line((7.991286, 4.150298), (7.991286, 5.393498))
                Line((7.991286, 5.393498), (14.502764, 5.393498))
                Line((14.502764, 5.393498), (14.502764, 7.209380255))
            make_face()
            with Locations((11.123663, 15.071852)):
                Rectangle(SKETCH12_W, SKETCH12_H)
        extrude(amount=BOSS_EXTRUDE6_DEPTH)

    # Sketch13 → Cut-Extrude7 (cut, two sides: drawn at the far end of the back side and taken through both)
    with SkipClean():  # the faces are left unmerged after this step: merging them gives an invalid solid
        with BuildSketch(Plane.XZ.offset(0.8).offset(-CUT_EXTRUDE7_DEPTH_BACK)):
            with Locations((0.103886, 19.459702)):
                Rectangle(SKETCH13_W, SKETCH13_H)
        extrude(amount=CUT_EXTRUDE7_DEPTH + CUT_EXTRUDE7_DEPTH_BACK, mode=Mode.SUBTRACT)

    # Cut-Extrude8 outline → Cut-Extrude8 (cut)
    with SkipClean():  # the faces are left unmerged after this step: merging them gives an invalid solid
        with BuildSketch(Plane(origin=(15.002764, 0, 0), x_dir=(0, 0, -1), z_dir=(1, 0, 0)).offset(CUT_EXTRUDE8_START)):
            with Locations((8.886698, -0.65)):
                Rectangle(CUT_EXTRUDE8_OUTLINE_W, CUT_EXTRUDE8_OUTLINE_H)
            with Locations((19.351498, -0.361358901)):
                Rectangle(CUT_EXTRUDE8_OUTLINE_W_2, CUT_EXTRUDE8_OUTLINE_H_2)
        extrude(amount=CUT_EXTRUDE8_DEPTH, mode=Mode.SUBTRACT)

    # Sketch15 → Cut-Extrude9 (cut, two sides: drawn at the far end of the back side and taken through both)
    with SkipClean():  # the faces are left unmerged after this step: merging them gives an invalid solid
        with BuildSketch(Plane(origin=(0, -1.5, 0), x_dir=(1, 0, 0), z_dir=(0, 1, 0)).offset(-CUT_EXTRUDE9_DEPTH_BACK)):
            with Locations((-11.602764, -0.0508)):
                Rectangle(SKETCH15_W, SKETCH15_H)
        extrude(amount=CUT_EXTRUDE9_DEPTH + CUT_EXTRUDE9_DEPTH_BACK, mode=Mode.SUBTRACT)

    # Sketch16 → Cut-Extrude10 (cut)
    with SkipClean():  # the faces are left unmerged after this step: merging them gives an invalid solid
        with BuildSketch(Plane(origin=(0, -1, 0), x_dir=(1, 0, 0), z_dir=(0, 1, 0))):
            with Locations((12.499086, -14.582902)):
                Rectangle(SKETCH16_W, SKETCH16_H)
        extrude(amount=-CUT_EXTRUDE10_DEPTH, mode=Mode.SUBTRACT)

    # Cut-Extrude11 outline → Cut-Extrude11 (cut)
    with SkipClean():  # the faces are left unmerged after this step: merging them gives an invalid solid
        with BuildSketch(Plane(origin=(15.002764, 0, 0), x_dir=(0, 0, -1), z_dir=(1, 0, 0)).offset(CUT_EXTRUDE11_START)):
            with Locations((-14.71683, -0.25)):
                Rectangle(CUT_EXTRUDE11_OUTLINE_W, CUT_EXTRUDE11_OUTLINE_H)
        extrude(amount=CUT_EXTRUDE11_DEPTH, mode=Mode.SUBTRACT)


solid = part.part
